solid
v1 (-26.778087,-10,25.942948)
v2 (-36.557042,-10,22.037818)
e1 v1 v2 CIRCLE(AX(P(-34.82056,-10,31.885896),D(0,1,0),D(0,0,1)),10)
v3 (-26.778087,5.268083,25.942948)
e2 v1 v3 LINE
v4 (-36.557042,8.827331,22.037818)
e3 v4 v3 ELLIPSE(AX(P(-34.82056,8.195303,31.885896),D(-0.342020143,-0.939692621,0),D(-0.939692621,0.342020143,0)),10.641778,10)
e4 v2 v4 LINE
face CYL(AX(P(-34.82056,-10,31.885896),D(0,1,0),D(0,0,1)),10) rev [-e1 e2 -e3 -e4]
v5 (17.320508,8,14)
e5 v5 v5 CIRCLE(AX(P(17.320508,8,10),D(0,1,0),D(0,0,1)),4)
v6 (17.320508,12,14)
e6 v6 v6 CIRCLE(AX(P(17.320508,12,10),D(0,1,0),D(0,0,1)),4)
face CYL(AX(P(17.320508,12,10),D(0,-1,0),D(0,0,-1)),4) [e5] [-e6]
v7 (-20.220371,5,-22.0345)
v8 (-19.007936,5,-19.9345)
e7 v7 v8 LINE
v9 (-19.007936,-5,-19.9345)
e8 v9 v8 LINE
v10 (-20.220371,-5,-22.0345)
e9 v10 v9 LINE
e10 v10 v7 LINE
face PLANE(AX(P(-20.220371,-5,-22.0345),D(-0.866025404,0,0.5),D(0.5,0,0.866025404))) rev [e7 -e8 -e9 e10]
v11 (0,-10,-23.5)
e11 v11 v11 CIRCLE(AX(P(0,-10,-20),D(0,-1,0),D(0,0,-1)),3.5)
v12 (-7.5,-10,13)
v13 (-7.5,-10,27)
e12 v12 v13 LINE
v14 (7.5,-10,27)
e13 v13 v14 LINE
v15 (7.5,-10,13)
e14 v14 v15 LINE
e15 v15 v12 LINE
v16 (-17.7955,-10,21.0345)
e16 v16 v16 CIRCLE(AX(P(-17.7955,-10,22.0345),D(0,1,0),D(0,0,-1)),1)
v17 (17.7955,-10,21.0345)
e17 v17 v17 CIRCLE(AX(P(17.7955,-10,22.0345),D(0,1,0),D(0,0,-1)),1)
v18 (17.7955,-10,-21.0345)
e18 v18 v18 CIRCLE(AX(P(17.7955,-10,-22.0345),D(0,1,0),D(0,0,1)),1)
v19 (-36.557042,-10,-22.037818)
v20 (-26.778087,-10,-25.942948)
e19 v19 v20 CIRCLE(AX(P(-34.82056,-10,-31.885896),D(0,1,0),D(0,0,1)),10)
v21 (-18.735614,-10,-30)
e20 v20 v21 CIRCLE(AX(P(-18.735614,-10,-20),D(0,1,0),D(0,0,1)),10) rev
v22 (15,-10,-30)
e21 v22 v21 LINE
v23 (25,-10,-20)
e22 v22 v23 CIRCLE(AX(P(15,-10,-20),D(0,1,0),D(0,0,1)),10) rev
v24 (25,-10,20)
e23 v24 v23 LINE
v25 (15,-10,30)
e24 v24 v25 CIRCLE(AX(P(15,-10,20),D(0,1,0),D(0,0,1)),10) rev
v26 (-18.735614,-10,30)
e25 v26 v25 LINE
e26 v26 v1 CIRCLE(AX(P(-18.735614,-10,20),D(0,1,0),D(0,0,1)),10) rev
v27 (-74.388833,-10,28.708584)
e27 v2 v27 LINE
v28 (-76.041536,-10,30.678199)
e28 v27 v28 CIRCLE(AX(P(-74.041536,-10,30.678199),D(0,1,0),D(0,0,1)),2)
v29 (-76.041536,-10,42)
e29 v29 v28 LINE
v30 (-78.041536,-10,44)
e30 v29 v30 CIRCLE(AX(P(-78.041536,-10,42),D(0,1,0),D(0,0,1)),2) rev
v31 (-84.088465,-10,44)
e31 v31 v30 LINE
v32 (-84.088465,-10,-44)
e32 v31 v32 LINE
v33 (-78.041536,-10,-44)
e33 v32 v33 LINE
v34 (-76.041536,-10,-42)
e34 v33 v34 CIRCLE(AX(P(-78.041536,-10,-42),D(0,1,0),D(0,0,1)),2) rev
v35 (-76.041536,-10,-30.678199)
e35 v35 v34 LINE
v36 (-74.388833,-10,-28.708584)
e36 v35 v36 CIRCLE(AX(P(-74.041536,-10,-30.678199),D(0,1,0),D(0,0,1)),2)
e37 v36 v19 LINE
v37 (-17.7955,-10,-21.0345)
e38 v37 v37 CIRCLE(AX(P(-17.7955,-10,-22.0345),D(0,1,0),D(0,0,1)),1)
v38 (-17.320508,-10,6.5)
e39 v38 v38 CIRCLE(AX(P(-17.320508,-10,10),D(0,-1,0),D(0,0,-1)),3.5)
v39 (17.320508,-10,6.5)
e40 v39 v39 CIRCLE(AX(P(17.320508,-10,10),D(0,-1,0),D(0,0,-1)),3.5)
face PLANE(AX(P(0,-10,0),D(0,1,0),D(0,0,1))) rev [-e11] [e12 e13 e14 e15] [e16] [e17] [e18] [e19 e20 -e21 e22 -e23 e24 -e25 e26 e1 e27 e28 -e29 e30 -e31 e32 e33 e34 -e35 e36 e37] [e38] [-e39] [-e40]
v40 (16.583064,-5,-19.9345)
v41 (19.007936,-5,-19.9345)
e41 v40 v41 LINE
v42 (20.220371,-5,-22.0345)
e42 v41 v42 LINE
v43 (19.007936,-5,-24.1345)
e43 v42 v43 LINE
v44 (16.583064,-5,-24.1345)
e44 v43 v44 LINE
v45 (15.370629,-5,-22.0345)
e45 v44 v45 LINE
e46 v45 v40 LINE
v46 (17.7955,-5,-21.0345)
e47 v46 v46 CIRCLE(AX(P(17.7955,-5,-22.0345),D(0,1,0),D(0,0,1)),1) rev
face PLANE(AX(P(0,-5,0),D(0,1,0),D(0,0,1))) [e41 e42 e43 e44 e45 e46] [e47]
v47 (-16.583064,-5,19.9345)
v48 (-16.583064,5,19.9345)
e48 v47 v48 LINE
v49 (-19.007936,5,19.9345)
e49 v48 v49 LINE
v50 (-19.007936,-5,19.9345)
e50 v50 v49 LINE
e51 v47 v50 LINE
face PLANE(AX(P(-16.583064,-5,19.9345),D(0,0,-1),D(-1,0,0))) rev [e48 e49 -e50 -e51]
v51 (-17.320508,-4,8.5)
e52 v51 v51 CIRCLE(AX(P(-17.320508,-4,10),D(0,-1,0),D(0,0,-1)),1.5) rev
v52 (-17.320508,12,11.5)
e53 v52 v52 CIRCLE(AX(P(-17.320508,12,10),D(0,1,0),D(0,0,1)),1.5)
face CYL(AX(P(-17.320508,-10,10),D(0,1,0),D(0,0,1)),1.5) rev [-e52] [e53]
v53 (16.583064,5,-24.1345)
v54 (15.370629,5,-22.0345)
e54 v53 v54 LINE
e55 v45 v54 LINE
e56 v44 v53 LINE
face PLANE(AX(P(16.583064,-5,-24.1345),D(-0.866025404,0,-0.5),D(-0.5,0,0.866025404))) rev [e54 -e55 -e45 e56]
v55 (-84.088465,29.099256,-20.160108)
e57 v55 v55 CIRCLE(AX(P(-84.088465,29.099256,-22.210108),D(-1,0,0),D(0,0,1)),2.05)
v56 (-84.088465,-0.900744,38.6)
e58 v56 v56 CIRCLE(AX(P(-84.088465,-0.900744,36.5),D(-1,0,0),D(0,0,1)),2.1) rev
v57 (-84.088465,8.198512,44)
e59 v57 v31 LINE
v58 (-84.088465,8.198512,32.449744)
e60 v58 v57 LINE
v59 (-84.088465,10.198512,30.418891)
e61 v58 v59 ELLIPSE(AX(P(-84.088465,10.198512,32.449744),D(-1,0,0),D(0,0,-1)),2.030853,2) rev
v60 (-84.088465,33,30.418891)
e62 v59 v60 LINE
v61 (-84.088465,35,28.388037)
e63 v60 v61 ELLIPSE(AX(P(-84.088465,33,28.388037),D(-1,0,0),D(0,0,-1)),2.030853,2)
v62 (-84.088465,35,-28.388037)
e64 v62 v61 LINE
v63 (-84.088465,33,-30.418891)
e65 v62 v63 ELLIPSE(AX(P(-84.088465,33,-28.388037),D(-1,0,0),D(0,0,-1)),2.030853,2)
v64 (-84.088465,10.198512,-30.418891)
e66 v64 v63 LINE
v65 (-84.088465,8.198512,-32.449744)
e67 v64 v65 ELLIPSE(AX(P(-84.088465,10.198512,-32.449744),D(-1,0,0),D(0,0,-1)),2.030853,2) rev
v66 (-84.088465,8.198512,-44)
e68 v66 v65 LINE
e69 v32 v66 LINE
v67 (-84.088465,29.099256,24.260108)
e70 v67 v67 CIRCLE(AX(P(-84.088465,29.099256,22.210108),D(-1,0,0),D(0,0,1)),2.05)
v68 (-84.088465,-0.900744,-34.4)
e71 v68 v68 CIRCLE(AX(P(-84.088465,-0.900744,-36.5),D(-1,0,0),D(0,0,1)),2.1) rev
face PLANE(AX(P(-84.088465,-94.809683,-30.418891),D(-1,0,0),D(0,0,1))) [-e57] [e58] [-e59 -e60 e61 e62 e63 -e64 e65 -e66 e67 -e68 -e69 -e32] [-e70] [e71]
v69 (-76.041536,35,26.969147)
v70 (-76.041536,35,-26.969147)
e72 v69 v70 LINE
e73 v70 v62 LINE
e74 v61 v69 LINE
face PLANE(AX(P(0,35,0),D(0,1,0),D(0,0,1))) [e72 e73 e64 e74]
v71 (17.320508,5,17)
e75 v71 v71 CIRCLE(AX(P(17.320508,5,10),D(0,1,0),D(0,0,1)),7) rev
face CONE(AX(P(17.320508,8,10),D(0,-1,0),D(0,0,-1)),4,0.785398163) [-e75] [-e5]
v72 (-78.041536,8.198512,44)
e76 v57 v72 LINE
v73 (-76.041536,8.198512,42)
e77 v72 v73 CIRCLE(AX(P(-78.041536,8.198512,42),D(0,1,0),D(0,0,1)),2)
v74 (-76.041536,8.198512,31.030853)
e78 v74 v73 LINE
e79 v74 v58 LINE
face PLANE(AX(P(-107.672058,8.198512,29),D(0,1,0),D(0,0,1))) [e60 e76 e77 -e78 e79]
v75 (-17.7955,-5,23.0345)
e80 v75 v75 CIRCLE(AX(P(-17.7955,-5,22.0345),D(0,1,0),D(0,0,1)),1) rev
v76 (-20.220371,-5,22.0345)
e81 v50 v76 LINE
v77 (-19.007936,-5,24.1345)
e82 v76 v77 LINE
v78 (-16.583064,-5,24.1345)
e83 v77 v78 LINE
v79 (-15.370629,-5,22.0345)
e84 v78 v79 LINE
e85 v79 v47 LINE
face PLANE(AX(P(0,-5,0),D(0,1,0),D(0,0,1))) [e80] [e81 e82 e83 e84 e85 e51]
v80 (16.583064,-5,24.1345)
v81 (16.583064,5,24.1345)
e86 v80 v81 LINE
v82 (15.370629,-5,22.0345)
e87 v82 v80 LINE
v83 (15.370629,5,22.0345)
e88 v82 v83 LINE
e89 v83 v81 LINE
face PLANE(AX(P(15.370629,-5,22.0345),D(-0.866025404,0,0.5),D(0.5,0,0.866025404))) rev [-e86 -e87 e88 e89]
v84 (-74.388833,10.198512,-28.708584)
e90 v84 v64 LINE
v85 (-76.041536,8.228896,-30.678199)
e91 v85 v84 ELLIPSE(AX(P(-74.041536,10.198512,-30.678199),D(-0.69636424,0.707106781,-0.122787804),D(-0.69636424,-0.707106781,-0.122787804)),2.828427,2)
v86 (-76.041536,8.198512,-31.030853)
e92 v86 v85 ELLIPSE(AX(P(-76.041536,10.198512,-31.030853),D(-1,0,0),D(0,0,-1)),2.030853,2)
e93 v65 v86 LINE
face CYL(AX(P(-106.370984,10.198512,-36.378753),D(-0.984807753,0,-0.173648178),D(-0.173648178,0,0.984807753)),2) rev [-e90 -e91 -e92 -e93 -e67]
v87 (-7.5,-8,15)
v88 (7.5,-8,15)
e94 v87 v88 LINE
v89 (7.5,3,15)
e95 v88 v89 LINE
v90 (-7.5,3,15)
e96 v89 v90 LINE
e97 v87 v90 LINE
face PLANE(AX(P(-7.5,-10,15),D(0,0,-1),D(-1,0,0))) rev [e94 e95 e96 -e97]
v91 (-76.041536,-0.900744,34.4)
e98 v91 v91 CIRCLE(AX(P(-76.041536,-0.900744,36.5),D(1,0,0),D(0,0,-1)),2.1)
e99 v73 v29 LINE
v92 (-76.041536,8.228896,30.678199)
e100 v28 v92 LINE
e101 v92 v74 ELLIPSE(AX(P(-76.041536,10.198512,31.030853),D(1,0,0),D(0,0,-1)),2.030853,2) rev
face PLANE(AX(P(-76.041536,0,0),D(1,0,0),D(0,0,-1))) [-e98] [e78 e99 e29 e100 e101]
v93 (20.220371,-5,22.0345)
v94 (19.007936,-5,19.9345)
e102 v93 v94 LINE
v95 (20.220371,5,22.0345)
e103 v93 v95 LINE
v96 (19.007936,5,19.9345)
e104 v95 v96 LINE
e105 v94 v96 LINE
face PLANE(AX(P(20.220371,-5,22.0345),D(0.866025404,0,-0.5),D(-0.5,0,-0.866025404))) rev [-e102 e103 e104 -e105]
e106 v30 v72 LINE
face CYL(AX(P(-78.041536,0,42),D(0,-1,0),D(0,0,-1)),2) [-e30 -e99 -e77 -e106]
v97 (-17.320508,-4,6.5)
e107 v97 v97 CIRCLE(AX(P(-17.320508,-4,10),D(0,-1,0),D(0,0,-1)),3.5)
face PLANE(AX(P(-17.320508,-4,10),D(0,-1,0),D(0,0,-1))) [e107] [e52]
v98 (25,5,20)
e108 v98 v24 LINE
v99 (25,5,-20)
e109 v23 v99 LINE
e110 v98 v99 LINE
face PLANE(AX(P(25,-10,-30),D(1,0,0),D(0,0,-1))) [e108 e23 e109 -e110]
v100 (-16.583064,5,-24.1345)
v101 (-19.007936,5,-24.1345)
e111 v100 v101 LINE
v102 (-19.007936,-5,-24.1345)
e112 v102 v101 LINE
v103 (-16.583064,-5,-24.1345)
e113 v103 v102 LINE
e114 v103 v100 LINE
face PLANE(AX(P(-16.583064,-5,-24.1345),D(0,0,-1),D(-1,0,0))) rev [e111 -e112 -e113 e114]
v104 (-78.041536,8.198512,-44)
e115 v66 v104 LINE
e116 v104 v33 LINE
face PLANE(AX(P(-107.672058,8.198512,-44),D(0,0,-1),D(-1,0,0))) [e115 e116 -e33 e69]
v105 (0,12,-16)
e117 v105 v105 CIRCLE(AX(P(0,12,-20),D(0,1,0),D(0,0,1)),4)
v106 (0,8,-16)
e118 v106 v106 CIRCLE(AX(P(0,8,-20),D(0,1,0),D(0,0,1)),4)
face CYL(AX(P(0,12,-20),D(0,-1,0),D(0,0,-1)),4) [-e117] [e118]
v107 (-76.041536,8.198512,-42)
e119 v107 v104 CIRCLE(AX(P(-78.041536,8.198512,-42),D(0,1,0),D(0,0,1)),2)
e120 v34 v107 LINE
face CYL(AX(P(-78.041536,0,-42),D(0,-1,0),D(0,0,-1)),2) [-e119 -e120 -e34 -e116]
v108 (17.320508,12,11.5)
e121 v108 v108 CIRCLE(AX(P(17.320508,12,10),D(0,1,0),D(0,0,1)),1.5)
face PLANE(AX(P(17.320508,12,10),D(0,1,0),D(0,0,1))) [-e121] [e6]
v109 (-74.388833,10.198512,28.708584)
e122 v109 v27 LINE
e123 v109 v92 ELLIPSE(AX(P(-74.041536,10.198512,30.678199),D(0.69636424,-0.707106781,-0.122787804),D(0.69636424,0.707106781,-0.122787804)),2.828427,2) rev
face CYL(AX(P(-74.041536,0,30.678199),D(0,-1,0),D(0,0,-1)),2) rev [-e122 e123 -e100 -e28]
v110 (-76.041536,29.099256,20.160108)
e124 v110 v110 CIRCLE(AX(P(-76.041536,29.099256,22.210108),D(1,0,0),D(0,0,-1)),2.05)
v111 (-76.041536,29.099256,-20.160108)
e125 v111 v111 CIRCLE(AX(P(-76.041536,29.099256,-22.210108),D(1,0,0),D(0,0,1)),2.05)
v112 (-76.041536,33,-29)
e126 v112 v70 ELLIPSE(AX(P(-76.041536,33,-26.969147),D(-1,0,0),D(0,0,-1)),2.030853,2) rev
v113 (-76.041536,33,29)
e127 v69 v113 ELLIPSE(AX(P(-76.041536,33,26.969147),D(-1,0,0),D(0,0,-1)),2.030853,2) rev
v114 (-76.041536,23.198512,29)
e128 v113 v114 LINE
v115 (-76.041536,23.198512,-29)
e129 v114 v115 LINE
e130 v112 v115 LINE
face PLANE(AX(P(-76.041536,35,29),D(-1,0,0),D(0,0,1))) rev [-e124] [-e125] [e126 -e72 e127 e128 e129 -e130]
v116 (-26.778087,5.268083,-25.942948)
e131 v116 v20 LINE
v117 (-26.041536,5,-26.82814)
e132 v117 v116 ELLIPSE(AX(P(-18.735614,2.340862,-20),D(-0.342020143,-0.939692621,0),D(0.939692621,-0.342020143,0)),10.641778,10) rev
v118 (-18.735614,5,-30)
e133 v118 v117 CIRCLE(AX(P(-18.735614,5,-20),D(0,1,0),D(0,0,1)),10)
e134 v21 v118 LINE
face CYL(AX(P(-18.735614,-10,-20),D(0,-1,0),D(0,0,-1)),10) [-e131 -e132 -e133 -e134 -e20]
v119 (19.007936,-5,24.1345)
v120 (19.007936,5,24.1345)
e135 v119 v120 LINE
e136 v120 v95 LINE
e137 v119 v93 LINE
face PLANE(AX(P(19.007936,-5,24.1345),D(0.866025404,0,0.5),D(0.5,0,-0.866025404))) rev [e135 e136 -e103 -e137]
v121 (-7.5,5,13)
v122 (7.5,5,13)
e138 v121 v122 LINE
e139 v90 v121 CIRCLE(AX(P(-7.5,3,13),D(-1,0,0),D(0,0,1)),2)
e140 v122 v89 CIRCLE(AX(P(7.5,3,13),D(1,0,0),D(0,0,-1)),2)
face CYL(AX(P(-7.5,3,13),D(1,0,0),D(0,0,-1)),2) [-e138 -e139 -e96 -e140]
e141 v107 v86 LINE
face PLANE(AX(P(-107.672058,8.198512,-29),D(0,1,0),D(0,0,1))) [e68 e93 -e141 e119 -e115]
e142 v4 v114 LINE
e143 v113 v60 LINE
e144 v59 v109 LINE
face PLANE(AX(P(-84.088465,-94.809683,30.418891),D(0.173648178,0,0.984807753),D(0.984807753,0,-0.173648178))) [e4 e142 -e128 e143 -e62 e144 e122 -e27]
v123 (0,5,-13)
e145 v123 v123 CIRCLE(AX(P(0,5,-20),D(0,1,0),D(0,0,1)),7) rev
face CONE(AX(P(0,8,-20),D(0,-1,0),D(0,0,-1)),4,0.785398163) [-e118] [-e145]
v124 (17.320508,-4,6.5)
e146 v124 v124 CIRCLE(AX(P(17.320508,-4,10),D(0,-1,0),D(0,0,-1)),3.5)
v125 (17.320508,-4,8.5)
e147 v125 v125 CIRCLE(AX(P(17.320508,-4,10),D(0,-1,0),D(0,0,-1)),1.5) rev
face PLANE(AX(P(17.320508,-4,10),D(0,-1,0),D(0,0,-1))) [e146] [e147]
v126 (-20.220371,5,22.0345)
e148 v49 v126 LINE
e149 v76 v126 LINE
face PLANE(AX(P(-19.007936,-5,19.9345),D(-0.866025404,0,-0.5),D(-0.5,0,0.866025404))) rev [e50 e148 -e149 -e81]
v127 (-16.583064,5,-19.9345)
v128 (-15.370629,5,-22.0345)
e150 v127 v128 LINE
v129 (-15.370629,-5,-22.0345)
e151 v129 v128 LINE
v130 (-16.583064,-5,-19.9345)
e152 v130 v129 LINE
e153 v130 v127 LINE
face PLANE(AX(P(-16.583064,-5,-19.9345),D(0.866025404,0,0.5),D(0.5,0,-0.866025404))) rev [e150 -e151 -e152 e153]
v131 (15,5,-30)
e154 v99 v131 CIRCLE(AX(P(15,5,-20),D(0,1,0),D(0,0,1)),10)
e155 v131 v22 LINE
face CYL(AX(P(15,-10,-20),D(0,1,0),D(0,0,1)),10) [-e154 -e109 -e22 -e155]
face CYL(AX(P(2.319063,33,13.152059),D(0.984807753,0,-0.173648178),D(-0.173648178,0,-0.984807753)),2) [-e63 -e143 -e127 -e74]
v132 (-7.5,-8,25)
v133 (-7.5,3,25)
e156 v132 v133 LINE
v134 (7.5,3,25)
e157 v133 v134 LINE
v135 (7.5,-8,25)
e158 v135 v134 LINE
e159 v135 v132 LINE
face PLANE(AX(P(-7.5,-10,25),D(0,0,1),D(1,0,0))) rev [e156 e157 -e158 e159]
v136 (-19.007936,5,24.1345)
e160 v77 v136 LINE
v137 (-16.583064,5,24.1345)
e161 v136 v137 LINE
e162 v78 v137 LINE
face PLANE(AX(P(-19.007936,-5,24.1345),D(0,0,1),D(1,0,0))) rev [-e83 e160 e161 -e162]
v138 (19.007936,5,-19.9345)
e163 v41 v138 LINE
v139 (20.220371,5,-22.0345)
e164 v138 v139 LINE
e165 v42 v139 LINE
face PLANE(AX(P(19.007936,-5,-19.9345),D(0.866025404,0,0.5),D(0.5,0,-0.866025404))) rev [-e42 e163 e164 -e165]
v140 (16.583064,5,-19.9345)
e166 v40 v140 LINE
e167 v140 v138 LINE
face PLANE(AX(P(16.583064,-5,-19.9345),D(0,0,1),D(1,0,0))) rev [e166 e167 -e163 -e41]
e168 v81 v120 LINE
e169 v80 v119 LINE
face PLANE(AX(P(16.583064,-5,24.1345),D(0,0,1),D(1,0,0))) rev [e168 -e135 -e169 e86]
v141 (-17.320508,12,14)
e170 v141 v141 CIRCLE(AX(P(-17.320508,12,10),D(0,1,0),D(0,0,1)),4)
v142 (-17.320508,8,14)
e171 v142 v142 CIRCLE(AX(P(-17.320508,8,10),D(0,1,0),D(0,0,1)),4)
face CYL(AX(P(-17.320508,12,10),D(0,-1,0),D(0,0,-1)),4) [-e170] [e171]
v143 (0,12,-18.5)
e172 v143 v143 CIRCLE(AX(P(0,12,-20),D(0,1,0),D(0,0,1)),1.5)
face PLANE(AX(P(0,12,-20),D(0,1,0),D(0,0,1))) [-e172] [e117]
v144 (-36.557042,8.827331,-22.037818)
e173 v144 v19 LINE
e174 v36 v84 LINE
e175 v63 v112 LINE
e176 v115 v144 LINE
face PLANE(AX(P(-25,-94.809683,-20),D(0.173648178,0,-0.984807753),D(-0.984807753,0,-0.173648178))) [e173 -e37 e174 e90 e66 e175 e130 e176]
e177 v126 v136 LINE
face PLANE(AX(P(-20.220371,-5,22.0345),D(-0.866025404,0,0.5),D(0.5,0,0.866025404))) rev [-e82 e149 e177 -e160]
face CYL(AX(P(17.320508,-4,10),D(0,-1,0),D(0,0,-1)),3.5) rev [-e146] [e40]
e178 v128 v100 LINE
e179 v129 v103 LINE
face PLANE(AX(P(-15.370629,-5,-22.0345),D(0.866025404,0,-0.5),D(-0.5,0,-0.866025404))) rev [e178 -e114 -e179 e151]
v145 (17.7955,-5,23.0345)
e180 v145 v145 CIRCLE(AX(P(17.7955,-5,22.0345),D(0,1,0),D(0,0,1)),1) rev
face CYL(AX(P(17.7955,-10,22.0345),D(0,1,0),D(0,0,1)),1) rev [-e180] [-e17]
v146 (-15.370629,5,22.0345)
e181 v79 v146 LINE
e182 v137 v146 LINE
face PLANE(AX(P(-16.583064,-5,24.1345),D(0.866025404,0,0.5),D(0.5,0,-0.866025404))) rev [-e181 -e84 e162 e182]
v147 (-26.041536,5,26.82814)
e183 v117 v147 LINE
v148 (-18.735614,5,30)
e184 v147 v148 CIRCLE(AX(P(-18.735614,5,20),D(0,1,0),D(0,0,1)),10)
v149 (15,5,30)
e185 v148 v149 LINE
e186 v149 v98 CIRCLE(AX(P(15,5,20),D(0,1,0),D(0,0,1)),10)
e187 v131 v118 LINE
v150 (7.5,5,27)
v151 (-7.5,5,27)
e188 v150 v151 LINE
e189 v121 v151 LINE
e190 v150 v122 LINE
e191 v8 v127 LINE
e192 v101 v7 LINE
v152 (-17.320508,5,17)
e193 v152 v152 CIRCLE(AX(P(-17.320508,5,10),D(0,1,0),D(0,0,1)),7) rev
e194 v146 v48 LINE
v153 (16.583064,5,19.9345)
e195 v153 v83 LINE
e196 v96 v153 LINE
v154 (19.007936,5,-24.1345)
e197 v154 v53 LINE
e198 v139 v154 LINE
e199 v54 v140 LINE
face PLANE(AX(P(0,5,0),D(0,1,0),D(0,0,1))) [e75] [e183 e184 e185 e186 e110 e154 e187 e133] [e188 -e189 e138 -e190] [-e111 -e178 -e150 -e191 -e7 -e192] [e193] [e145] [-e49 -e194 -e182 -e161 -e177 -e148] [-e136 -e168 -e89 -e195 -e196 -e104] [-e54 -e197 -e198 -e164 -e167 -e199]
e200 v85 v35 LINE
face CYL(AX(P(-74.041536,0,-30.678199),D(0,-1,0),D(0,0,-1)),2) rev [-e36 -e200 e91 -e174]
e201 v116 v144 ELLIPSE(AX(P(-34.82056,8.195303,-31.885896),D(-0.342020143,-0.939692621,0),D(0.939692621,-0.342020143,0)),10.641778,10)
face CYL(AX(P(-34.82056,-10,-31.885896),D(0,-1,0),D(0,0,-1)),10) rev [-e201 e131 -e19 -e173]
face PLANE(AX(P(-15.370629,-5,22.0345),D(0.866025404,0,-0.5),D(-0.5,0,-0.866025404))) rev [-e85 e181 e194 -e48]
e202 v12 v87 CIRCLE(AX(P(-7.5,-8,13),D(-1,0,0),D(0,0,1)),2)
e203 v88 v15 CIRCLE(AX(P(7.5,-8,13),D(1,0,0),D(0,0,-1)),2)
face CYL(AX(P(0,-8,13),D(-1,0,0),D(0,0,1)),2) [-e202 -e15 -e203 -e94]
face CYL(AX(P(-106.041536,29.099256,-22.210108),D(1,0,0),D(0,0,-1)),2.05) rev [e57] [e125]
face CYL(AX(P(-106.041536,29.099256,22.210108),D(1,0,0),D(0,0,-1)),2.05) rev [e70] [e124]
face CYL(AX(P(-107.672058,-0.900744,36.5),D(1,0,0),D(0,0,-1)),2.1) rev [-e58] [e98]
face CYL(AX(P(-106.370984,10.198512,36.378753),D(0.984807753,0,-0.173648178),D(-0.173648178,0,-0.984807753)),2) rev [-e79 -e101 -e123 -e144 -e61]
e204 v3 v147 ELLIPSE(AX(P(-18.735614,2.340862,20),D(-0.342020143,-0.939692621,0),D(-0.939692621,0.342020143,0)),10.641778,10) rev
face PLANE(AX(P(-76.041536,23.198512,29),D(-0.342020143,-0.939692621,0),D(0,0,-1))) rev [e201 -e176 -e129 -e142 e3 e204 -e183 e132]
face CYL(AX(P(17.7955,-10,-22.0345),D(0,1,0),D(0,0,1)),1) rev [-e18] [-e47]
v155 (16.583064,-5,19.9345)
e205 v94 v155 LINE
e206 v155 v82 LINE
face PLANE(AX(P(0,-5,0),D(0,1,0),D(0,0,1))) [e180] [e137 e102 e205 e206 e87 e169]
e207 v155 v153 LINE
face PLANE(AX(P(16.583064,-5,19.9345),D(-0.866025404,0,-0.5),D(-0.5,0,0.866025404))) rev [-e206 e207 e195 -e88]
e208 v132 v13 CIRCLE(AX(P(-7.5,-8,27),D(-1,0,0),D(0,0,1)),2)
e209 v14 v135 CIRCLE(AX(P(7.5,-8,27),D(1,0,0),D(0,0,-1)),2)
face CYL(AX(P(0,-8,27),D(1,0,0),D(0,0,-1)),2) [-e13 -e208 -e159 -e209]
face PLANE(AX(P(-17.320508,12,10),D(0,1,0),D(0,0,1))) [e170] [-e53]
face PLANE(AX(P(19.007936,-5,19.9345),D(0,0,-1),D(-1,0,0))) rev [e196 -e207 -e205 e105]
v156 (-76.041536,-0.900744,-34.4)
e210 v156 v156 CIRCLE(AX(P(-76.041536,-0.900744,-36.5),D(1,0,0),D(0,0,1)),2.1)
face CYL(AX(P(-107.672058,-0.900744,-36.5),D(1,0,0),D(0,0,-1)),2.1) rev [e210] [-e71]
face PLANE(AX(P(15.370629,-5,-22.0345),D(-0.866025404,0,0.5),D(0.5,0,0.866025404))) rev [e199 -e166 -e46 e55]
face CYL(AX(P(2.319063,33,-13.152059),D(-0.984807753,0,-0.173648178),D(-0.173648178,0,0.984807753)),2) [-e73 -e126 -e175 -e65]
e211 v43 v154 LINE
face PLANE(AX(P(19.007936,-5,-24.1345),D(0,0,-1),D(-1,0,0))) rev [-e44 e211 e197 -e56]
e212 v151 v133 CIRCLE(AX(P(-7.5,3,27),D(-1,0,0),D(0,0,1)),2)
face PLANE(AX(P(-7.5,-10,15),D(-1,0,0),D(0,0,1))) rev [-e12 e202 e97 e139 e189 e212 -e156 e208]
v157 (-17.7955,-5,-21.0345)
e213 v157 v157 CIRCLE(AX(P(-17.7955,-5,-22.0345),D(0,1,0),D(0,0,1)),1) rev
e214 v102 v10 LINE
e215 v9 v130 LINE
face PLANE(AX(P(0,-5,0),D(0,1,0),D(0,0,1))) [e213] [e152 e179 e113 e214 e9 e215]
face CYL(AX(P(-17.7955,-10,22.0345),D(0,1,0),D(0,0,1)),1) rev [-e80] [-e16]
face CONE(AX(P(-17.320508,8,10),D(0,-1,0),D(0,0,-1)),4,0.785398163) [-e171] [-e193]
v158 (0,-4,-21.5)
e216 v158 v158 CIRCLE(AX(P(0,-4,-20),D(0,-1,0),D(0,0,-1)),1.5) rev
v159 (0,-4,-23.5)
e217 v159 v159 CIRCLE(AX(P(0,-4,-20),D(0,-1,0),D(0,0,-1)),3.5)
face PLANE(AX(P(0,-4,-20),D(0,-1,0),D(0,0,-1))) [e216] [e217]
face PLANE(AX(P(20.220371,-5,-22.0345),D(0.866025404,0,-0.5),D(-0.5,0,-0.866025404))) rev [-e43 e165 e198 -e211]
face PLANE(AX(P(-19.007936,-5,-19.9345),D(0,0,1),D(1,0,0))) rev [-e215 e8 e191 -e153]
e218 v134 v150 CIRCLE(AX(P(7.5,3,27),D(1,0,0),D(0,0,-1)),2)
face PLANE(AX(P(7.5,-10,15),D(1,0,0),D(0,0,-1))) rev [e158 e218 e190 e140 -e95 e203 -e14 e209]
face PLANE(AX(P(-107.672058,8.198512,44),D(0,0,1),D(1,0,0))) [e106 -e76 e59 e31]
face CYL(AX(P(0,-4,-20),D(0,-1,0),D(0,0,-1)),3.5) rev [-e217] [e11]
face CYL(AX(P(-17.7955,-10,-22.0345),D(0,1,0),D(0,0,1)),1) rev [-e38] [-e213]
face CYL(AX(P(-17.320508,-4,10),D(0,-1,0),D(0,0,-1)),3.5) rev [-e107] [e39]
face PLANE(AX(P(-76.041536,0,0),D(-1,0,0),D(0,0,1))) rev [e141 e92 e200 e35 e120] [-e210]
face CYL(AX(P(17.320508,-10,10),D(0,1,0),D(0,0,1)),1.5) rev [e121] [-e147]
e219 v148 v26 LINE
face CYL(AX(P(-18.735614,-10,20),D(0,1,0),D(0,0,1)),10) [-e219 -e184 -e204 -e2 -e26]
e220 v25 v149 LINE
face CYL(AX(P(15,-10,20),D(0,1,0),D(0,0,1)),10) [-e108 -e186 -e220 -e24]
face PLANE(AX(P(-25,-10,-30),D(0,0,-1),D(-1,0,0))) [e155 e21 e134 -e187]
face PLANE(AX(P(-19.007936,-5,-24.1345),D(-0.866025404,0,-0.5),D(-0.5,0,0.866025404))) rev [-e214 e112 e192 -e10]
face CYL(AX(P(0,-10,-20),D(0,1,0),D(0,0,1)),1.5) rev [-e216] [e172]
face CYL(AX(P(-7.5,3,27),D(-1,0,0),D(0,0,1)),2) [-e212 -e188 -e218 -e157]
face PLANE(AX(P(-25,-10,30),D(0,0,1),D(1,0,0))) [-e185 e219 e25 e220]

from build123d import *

# Parameters (mm, degrees)
EXTRUDE_1_DEPTH      = 5
EXTRUDE_1_DEPTH_BACK = 10
SKETCH_1_W           = 50
SKETCH_1_H           = 60
SKETCH_1_R           = 1
SKETCH_1_R_2         = 1.5
FILLET_1_R           = 10
SKETCH_5_R           = 4
SKETCH_5_R_2         = 1.5
EXTRUDE_3_DEPTH      = 7
SKETCH_6_R           = 3.5
CUT_EXTRUDE_1_DEPTH  = 6
SKETCH_7_W           = 15
SKETCH_7_H           = 10
CUT_EXTRUDE_2_DEPTH  = 42.833001327
CUT_EXTRUDE_3_DEPTH  = 10
CHAMFER_1_SIZE       = 3
FILLET_6_R           = 10
EXTRUDE_7_DEPTH      = 15
EXTRUDE_8_DEPTH      = 30
CHAMFER_2_SIZE       = 50
CHAMFER_2_SIZE2      = 18.198511713
SKETCH_16_R          = 2.05
CUT_EXTRUDE_4_DEPTH  = 30
FILLET_7_R           = 10
FILLET_8_R           = 10
SKETCH_17_W          = 15
SKETCH_17_H          = 18.198511713
SKETCH_17_R          = 2.1
EXTRUDE_9_DEPTH      = 8.046928804
FILLET_9_R           = 2
FILLET_10_R          = 2


with BuildPart() as part:
    # 草图1 → 凸台-拉伸1 (new, two sides: drawn at the far end of the back side and taken through both)
    with BuildSketch(Plane(origin=(0, 0, 0), x_dir=(1, 0, 0), z_dir=(0, 1, 0)).offset(-EXTRUDE_1_DEPTH_BACK)):
        Rectangle(SKETCH_1_W, SKETCH_1_H)
        with Locations(Location((-17.7955, 22.0345, 0), (0, 0, 270))):
            Circle(SKETCH_1_R, mode=Mode.SUBTRACT)
        with Locations(Location((17.7955, 22.0345, 0), (0, 0, 270))):
            Circle(SKETCH_1_R, mode=Mode.SUBTRACT)
        with Locations(Location((17.7955, -22.0345, 0), (0, 0, 90))):
            Circle(SKETCH_1_R, mode=Mode.SUBTRACT)
        with Locations(Location((-17.7955, -22.0345, 0), (0, 0, 90))):
            Circle(SKETCH_1_R, mode=Mode.SUBTRACT)
        with Locations(Location((-17.320508076, -10, 0), (0, 0, 270))):
            Circle(SKETCH_1_R_2, mode=Mode.SUBTRACT)
        with Locations(Location((17.320508076, -10, 0), (0, 0, 270))):
            Circle(SKETCH_1_R_2, mode=Mode.SUBTRACT)
        with Locations(Location((0, 20, 0), (0, 0, 270))):
            Circle(SKETCH_1_R_2, mode=Mode.SUBTRACT)
    extrude(amount=EXTRUDE_1_DEPTH + EXTRUDE_1_DEPTH_BACK)

    # 圆角1
    fillet_1_edges = [part.edges().sort_by_distance(p)[0] for p in [
        (25, -2.5, -30),
    ]]
    fillet(fillet_1_edges, radius=FILLET_1_R)

    # 草图5 → 凸台-拉伸3 (add)
    # profile 1 of 3: a face of its own
    with BuildSketch(Plane(origin=(0, 5, 0), x_dir=(1, 0, 0), z_dir=(0, 1, 0))):
        with Locations(Location((-17.320508076, -10, 0), (0, 0, 270))):
            Circle(SKETCH_5_R)
        with Locations(Location((-17.320508076, -10, 0), (0, 0, 270))):
            Circle(SKETCH_5_R_2, mode=Mode.SUBTRACT)
    # profile 2 of 3: a face of its own
    with BuildSketch(Plane(origin=(0, 5, 0), x_dir=(1, 0, 0), z_dir=(0, 1, 0))):
        with Locations(Location((17.320508076, -10, 0), (0, 0, 270))):
            Circle(SKETCH_5_R)
        with Locations(Location((17.320508076, -10, 0), (0, 0, 270))):
            Circle(SKETCH_5_R_2, mode=Mode.SUBTRACT)
    # profile 3 of 3: a face of its own
    with BuildSketch(Plane(origin=(0, 5, 0), x_dir=(1, 0, 0), z_dir=(0, 1, 0))):
        with Locations(Location((0, 20, 0), (0, 0, 270))):
            Circle(SKETCH_5_R)
        with Locations(Location((0, 20, 0), (0, 0, 270))):
            Circle(SKETCH_5_R_2, mode=Mode.SUBTRACT)
    extrude(amount=EXTRUDE_3_DEPTH)

    # 草图6 → 切除-拉伸1 (cut)
    with BuildSketch(Plane.XZ.offset(10)):
        with Locations(Location((-17.320508076, 10, 0), (0, 0, 270))):
            Circle(SKETCH_6_R)
        with Locations(Location((17.320508076, 10, 0), (0, 0, 270))):
            Circle(SKETCH_6_R)
        with Locations(Location((0, -20, 0), (0, 0, 270))):
            Circle(SKETCH_6_R)
    extrude(amount=-CUT_EXTRUDE_1_DEPTH, mode=Mode.SUBTRACT)

    # 草图7 → 切除-拉伸2 (cut, through all)
    with BuildSketch(Plane(origin=(0, 5, 0), x_dir=(1, 0, 0), z_dir=(0, 1, 0))):
        with Locations((0, -20)):
            Rectangle(SKETCH_7_W, SKETCH_7_H)
    extrude(amount=-CUT_EXTRUDE_2_DEPTH, mode=Mode.SUBTRACT)

    # 草图9 → 切除-拉伸3 (cut)
    with BuildSketch(Plane(origin=(0, 5, 0), x_dir=(1, 0, 0), z_dir=(0, 1, 0))):
        Polygon((-15.370628869, 22.0345), (-16.583064435, 24.1345), (-19.007935565, 24.1345), (-20.220371131, 22.0345), (-19.007935565, 19.9345), (-16.583064435, 19.9345), align=None)
        Polygon((20.220371131, 22.0345), (19.007935565, 24.1345), (16.583064435, 24.1345), (15.370628869, 22.0345), (16.583064435, 19.9345), (19.007935565, 19.9345), align=None)
        Polygon((20.220371131, -22.0345), (19.007935565, -19.9345), (16.583064435, -19.9345), (15.370628869, -22.0345), (16.583064435, -24.1345), (19.007935565, -24.1345), align=None)
        Polygon((-15.370628869, -22.0345), (-16.583064435, -19.9345), (-19.007935565, -19.9345), (-20.220371131, -22.0345), (-19.007935565, -24.1345), (-16.583064435, -24.1345), align=None)
    extrude(amount=-CUT_EXTRUDE_3_DEPTH, mode=Mode.SUBTRACT)

    # 倒角1
    chamfer_1_edges = [part.edges().sort_by_distance(p)[0] for p in [
        (17.320508076, 5, 6),
        (-17.320508076, 5, 6),
        (0, 5, -24),
    ]]
    chamfer(chamfer_1_edges, length=CHAMFER_1_SIZE)

    # 圆角6
    fillet_6_edges = [part.edges().sort_by_distance(p)[0] for p in [
        (25, -2.5, 30),
    ]]
    fillet(fillet_6_edges, radius=FILLET_6_R)

    # 草图13 → 凸台-拉伸7 (add)
    with BuildSketch(Plane(origin=(0, 5, 0), x_dir=(1, 0, 0), z_dir=(0, 1, 0))):
        Polygon((-25, 20), (-84.088465181, 30.41889066), (-84.088465181, -30.41889066), (-25, -20), align=None)
    extrude(amount=-EXTRUDE_7_DEPTH)

    # 草图15 → 凸台-拉伸8 (add)
    with BuildSketch(Plane(origin=(0, 5, 0), x_dir=(1, 0, 0), z_dir=(0, 1, 0))):
        Polygon((-84.088465181, 30.41889066), (-84.088465181, -30.41889066), (-76.041536377, -29), (-76.041536377, 29), align=None)
    extrude(amount=EXTRUDE_8_DEPTH)

    # 倒角2
    chamfer_2_edges = [part.edges().sort_by_distance(p)[0] for p in [
        (-76.041536377, 5, 0),
    ]]
    chamfer_2_side = [part.faces().sort_by_distance(p)[0] for p in [
        (-27.426102069, 5, -0.626933824),
    ]]
    chamfer(chamfer_2_edges, length=CHAMFER_2_SIZE, length2=CHAMFER_2_SIZE2, reference=chamfer_2_side[0])

    # 草图16 → 切除-拉伸4 (cut)
    with BuildSketch(Plane(origin=(-76.041536377, 0, 0), x_dir=(0, 0, -1), z_dir=(1, 0, 0))):
        with Locations((-22.210107848, 29.099255857)):
            Circle(SKETCH_16_R)
        with Locations(Location((22.210107848, 29.099255857, 0), (0, 0, 180))):
            Circle(SKETCH_16_R)
    extrude(amount=-CUT_EXTRUDE_4_DEPTH, mode=Mode.SUBTRACT)

    # 圆角7
    # the kernel refuses this fillet: 10 mm, written as the material it adds along each edge
    with BuildSketch(Plane(origin=(-25, 5, 20), x_dir=(-0.9848077530122087, 0, 0.1736481776669271), z_dir=(0, -1, 0))) as fillet_7_piece_1_section:
        with BuildLine():
            CenterArc((11.735327688, -10), FILLET_7_R, 90, 89.129514879)
            Line((1.736481777, -9.84807753), (1.536504858, -9.845039081))
            ThreePointArc((1.536504858, -9.845039081), (0.671279338, -4.958768401), (-0.196961551, -0.034729636))
            Line((-0.196961551, -0.034729636), (0, 0.2))
            Line((0, 0.2), (11.735327688, 0.2))
            Line((11.735327688, 0.2), (11.735327688, 0))
        make_face()
    fillet_7_piece_1 = extrude(amount=15, mode=Mode.PRIVATE)
    fillet_7_piece_1 = split(fillet_7_piece_1, bisect_by=Plane(origin=(-25.238476419, 4.707710079, 24.535111485), z_dir=(0.34202014332566943, 0.9396926207859082, 0)), keep=Keep.TOP, mode=Mode.PRIVATE)
    add(fillet_7_piece_1)
    with BuildSketch(Plane(origin=(-25, 34.338319221, 20), x_dir=(-0.9848077530122086, 0, 0.1736481776669274), z_dir=(0, -1, 0))) as fillet_7_piece_2_section:
        with BuildLine():
            CenterArc((11.735327688, -10), FILLET_7_R, 90, 89.129514879)
            Line((1.736481777, -9.84807753), (1.536504858, -9.845039081))
            ThreePointArc((1.536504858, -9.845039081), (0.671279338, -4.958768401), (-0.196961551, -0.034729636))
            Line((-0.196961551, -0.034729636), (0, 0.2))
            Line((0, 0.2), (11.735327688, 0.2))
            Line((11.735327688, 0.2), (11.735327688, 0))
        make_face()
    fillet_7_piece_2 = extrude(amount=44.338319221, mode=Mode.PRIVATE)
    fillet_7_piece_2 = split(fillet_7_piece_2, bisect_by=Plane(origin=(-30.668809733, 5, 21.998884798), z_dir=(0, 1, 0)), keep=Keep.TOP, mode=Mode.PRIVATE)
    fillet_7_piece_2 = split(fillet_7_piece_2, bisect_by=Plane(origin=(-30.398165654, 6.585683379, 21.998884798), z_dir=(-0.34202014332566943, -0.9396926207859082, 0)), keep=Keep.TOP, mode=Mode.PRIVATE)
    add(fillet_7_piece_2)
    with BuildSketch(Plane(origin=(-25, 5, 20), x_dir=(-0.9848077530122087, 0, 0.1736481776669271), z_dir=(0, -1, 0))) as fillet_7_piece_3_section:
        with BuildLine():
            CenterArc((11.735327688, -10), FILLET_7_R, 90, 89.129514879)
            Line((1.736481777, -9.84807753), (1.536504858, -9.845039081))
            ThreePointArc((1.536504858, -9.845039081), (0.671279338, -4.958768401), (-0.196961551, -0.034729636))
            Line((-0.196961551, -0.034729636), (0, 0.2))
            Line((0, 0.2), (11.735327688, 0.2))
            Line((11.735327688, 0.2), (11.735327688, 0))
        make_face()
    fillet_7_piece_3 = extrude(amount=15, mode=Mode.PRIVATE)
    fillet_7_piece_3 = split(fillet_7_piece_3, bisect_by=Plane(origin=(-25.122308075, 4.66542826, 23.000783261), z_dir=(-0.34202014332566943, -0.9396926207859082, 0)), keep=Keep.TOP, mode=Mode.PRIVATE)
    add(fillet_7_piece_3)
    with BuildSketch(Plane(origin=(-25, 5, -20), x_dir=(-0.9848077530122087, 0, -0.1736481776669263), z_dir=(0, -1, 0))) as fillet_7_piece_4_section:
        with BuildLine():
            CenterArc((11.735327688, 10), FILLET_7_R, 180.870485121, 89.129514879)
            Line((1.736481777, 9.84807753), (1.536504858, 9.845039081))
            ThreePointArc((1.536504858, 9.845039081), (0.671279338, 4.958768401), (-0.196961551, 0.034729636))
            Line((-0.196961551, 0.034729636), (0, -0.2))
            Line((0, -0.2), (11.735327688, -0.2))
            Line((11.735327688, -0.2), (11.735327688, 0))
        make_face()
    fillet_7_piece_4 = extrude(amount=15, mode=Mode.PRIVATE)
    fillet_7_piece_4 = split(fillet_7_piece_4, bisect_by=Plane(origin=(-25.238476419, 4.707710079, -24.535111485), z_dir=(0.34202014332566943, 0.9396926207859082, 0)), keep=Keep.TOP, mode=Mode.PRIVATE)
    add(fillet_7_piece_4)
    with BuildSketch(Plane(origin=(-25, 34.338319221, -20), x_dir=(-0.9848077530122087, 0, -0.17364817766692656), z_dir=(0, -1, 0))) as fillet_7_piece_5_section:
        with BuildLine():
            CenterArc((11.735327688, 10), FILLET_7_R, 180.870485121, 89.129514879)
            Line((1.736481777, 9.84807753), (1.536504858, 9.845039081))
            ThreePointArc((1.536504858, 9.845039081), (0.671279338, 4.958768401), (-0.196961551, 0.034729636))
            Line((-0.196961551, 0.034729636), (0, -0.2))
            Line((0, -0.2), (11.735327688, -0.2))
            Line((11.735327688, -0.2), (11.735327688, 0))
        make_face()
    fillet_7_piece_5 = extrude(amount=44.338319221, mode=Mode.PRIVATE)
    fillet_7_piece_5 = split(fillet_7_piece_5, bisect_by=Plane(origin=(-30.668809733, 5, -21.998884798), z_dir=(0, 1, 0)), keep=Keep.TOP, mode=Mode.PRIVATE)
    fillet_7_piece_5 = split(fillet_7_piece_5, bisect_by=Plane(origin=(-30.398165654, 6.585683379, -21.998884798), z_dir=(-0.34202014332566943, -0.9396926207859082, 0)), keep=Keep.TOP, mode=Mode.PRIVATE)
    add(fillet_7_piece_5)
    with BuildSketch(Plane(origin=(-25, 5, -20), x_dir=(-0.9848077530122087, 0, -0.1736481776669263), z_dir=(0, -1, 0))) as fillet_7_piece_6_section:
        with BuildLine():
            CenterArc((11.735327688, 10), FILLET_7_R, 180.870485121, 89.129514879)
            Line((1.736481777, 9.84807753), (1.536504858, 9.845039081))
            ThreePointArc((1.536504858, 9.845039081), (0.671279338, 4.958768401), (-0.196961551, 0.034729636))
            Line((-0.196961551, 0.034729636), (0, -0.2))
            Line((0, -0.2), (11.735327688, -0.2))
            Line((11.735327688, -0.2), (11.735327688, 0))
        make_face()
    fillet_7_piece_6 = extrude(amount=15, mode=Mode.PRIVATE)
    fillet_7_piece_6 = split(fillet_7_piece_6, bisect_by=Plane(origin=(-25.122308075, 4.66542826, -23.000783261), z_dir=(-0.34202014332566943, -0.9396926207859082, 0)), keep=Keep.TOP, mode=Mode.PRIVATE)
    add(fillet_7_piece_6)

    # 圆角8
    # the kernel refuses this fillet: 10 mm, written as the material it takes off along each edge
    with BuildSketch(Plane(origin=(-25, -25.66096469, 30), x_dir=(1, 0, 0), z_dir=(0, 1, 0))) as fillet_8_piece_1:
        with BuildLine():
            CenterArc((6.264385876, 10), FILLET_8_R, 216.462375582, 53.537624418)
            ThreePointArc((-1.778087019, 4.057052101), (-0.661580538, 2.128216404), (0, 0))
            Line((0, 0), (6.264385876, 0))
        make_face()
    extrude(amount=46.321929379, mode=Mode.SUBTRACT)
    with BuildSketch(Plane(origin=(-25, 20.66096469, -30), x_dir=(-0.4014112201637374, 0, 0.9158979377237726), z_dir=(0, -1, 0))) as fillet_8_piece_2:
        with BuildLine():
            CenterArc((6.644384599, -9.751650306), FILLET_8_R, 102.79594523, 53.537624418)
            Line((-2.514594778, -5.737538105), (0, 0))
            ThreePointArc((0, 0), (2.214794866, -0.248349694), (4.429589733, 0))
        make_face()
    extrude(amount=46.321929379, mode=Mode.SUBTRACT)

    # 草图17 → 凸台-拉伸9 (add)
    # profile 1 of 2: a face of its own
    with BuildSketch(Plane(origin=(-76.041536377, 0, 0), x_dir=(0, 0, -1), z_dir=(1, 0, 0))):
        with Locations((-36.5, -0.900744143)):
            Rectangle(SKETCH_17_W, SKETCH_17_H)
        with Locations((-36.5, -0.900744143)):
            Circle(SKETCH_17_R, mode=Mode.SUBTRACT)
    # profile 2 of 2: a face of its own
    with BuildSketch(Plane(origin=(-76.041536377, 0, 0), x_dir=(0, 0, -1), z_dir=(1, 0, 0))):
        with Locations((36.5, -0.900744143)):
            Rectangle(SKETCH_17_W, SKETCH_17_H)
        with Locations(Location((36.5, -0.900744143, 0), (0, 0, 180))):
            Circle(SKETCH_17_R, mode=Mode.SUBTRACT)
    extrude(amount=-EXTRUDE_9_DEPTH)

    # 圆角9
    fillet_9_edges = [part.edges().sort_by_distance(p)[0] for p in [
        (-80.065000779, 8.198511713, -29.70944533),
        (-80.065000779, 8.198511713, 29.70944533),
        (-76.041536377, -0.900744143, -44),
        (-76.041536377, -0.900744143, 44),
        (-80.065000779, 35, 29.70944533),
        (-80.065000779, 35, -29.70944533),
        (-76.041536377, -0.900744143, 29),
        (-76.041536377, -0.900744143, -29),
    ]]
    fillet(fillet_9_edges, radius=FILLET_9_R)

    # 圆角10
    fillet_10_edges = [part.edges().sort_by_distance(p)[0] for p in [
        (0, -10, 25),
        (0, -10, 15),
        (0, 5, 15),
        (0, 5, 25),
    ]]
    fillet(fillet_10_edges, radius=FILLET_10_R)


solid = part.part
